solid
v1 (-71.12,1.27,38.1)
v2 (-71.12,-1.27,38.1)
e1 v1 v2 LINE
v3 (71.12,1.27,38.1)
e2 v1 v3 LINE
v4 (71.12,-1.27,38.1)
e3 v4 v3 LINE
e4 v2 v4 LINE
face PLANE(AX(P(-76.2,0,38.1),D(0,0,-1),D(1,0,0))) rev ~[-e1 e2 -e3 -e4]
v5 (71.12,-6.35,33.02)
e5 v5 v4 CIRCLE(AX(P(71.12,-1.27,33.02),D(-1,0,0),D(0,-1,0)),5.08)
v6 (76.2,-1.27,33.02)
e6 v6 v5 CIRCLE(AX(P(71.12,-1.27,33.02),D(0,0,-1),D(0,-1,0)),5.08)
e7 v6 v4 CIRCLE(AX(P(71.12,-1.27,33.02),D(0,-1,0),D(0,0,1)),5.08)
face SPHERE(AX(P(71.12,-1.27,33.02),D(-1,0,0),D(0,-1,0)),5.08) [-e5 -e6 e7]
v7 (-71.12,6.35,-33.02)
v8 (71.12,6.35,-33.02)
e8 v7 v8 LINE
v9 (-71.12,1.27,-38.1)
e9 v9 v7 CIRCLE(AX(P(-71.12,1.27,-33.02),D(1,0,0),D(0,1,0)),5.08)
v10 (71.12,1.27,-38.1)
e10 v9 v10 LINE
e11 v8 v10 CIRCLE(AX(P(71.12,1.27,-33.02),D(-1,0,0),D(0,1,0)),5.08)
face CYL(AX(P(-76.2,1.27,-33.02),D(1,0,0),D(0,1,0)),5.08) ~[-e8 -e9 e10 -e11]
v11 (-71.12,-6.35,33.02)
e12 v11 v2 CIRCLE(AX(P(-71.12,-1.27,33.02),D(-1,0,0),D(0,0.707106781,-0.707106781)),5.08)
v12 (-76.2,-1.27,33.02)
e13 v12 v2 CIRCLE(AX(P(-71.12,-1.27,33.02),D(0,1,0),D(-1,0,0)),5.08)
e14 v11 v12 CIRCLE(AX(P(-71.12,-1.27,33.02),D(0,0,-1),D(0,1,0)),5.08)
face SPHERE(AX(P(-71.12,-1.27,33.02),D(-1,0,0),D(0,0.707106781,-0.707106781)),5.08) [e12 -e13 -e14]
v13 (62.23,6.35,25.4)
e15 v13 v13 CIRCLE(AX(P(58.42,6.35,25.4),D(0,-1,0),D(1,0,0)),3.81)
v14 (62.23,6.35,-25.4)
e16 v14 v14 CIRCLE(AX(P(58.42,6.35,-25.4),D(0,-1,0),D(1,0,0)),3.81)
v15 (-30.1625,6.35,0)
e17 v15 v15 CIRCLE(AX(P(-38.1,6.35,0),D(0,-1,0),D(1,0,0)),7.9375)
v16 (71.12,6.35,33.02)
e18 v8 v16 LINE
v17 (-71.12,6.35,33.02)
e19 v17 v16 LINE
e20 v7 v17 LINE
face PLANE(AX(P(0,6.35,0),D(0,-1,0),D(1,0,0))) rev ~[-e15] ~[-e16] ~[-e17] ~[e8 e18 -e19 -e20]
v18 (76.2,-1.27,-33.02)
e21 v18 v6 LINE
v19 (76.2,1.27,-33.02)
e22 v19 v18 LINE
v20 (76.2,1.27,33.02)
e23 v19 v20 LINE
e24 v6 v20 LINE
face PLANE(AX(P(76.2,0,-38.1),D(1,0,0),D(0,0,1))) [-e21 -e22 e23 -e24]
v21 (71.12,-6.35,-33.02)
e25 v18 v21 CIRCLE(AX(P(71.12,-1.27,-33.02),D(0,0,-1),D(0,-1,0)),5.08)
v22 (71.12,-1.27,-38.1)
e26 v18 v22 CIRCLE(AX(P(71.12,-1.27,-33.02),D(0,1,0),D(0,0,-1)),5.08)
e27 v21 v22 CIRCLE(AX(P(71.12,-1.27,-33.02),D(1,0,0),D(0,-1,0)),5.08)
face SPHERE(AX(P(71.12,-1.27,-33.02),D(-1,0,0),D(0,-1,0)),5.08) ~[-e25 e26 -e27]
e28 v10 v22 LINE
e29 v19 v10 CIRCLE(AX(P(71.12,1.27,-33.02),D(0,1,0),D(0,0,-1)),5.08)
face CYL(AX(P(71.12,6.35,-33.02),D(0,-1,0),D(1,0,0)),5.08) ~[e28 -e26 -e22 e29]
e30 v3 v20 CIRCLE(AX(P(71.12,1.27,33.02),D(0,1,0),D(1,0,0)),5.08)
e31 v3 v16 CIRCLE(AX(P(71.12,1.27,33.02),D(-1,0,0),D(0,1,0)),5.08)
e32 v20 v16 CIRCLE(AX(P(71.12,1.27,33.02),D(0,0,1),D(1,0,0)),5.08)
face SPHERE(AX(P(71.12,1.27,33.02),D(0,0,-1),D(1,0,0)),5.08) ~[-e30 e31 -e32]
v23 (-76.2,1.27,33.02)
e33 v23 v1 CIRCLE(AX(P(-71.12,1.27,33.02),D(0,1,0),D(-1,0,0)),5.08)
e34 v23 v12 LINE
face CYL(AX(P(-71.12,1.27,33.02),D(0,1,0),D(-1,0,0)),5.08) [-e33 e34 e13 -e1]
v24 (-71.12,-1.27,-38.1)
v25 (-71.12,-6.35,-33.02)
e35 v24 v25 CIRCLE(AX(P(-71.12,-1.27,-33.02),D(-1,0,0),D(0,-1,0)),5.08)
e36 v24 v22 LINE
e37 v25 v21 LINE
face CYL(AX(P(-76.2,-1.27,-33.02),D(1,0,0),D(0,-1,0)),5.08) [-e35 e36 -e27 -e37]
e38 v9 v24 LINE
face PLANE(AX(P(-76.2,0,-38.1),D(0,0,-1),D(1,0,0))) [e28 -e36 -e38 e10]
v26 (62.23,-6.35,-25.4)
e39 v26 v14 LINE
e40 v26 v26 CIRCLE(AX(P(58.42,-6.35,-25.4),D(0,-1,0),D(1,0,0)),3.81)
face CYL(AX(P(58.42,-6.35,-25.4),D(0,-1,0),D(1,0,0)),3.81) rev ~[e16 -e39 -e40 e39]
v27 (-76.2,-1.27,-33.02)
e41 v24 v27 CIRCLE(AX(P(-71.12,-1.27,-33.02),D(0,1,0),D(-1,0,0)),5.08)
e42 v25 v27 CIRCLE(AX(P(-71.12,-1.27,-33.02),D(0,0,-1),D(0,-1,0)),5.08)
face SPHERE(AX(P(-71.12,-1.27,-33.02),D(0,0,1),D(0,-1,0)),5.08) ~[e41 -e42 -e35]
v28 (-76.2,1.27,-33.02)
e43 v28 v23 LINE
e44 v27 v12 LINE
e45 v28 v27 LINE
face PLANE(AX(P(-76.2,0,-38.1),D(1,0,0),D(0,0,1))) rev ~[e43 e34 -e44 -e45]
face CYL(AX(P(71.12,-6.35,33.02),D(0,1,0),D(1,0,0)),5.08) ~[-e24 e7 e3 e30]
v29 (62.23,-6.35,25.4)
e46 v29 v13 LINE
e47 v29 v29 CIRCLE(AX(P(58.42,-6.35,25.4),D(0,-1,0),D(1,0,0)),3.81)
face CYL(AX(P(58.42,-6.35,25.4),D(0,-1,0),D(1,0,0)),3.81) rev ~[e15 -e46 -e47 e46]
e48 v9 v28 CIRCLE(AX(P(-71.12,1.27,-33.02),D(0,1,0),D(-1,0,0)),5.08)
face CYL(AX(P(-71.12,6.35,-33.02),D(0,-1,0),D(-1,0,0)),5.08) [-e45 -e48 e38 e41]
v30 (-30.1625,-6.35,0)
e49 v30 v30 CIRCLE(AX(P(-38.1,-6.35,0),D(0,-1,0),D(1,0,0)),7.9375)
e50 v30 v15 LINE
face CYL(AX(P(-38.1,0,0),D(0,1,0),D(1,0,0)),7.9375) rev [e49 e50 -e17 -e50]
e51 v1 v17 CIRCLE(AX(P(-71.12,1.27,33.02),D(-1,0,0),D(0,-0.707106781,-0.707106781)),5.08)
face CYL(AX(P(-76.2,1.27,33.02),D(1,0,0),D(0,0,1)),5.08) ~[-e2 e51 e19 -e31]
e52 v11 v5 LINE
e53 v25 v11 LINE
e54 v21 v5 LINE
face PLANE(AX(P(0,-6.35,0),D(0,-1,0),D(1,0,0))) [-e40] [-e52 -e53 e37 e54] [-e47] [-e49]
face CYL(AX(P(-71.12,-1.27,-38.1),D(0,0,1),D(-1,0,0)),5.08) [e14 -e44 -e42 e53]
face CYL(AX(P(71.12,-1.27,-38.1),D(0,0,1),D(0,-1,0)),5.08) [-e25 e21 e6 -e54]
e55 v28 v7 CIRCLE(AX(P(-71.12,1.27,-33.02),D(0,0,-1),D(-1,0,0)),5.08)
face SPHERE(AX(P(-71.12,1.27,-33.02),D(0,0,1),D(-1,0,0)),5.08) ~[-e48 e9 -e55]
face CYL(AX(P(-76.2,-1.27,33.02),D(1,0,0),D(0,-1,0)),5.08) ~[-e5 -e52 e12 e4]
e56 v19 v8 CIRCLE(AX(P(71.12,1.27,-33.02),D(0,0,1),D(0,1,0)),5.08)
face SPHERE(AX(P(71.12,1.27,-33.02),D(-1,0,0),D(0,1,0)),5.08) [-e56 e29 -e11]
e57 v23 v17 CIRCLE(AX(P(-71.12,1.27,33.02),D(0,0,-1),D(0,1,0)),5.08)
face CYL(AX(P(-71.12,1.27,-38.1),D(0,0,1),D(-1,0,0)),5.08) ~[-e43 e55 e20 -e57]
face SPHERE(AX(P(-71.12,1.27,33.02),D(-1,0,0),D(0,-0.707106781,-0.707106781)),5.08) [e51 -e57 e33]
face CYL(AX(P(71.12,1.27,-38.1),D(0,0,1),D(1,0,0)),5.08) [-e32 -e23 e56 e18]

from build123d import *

# Parameters (mm, degrees)
F0_W         = 152.4
F0_H         = 76.2
F0_R         = 7.9375
F1_DEPTH     = 6.35
F2_R         = 5.08
F3_T1_DEPTH  = 2.54
F3_S5_W      = 5.08
F3_S5_H      = 5.08
F3_T6_DEPTH  = 5.08
F3_S11_W     = 5.08
F3_S11_H     = 5.08
F3_T12_DEPTH = 5.08
F4_R         = 3.81
F5_DEPTH     = 25.4


# Not quite as in the source:
# - a fillet or chamfer that OpenCascade refuses, or shapes differently, is made with other operations: its cross-section is extruded or revolved along the edge and cut away or added


with BuildPart() as f1:
    # F0 (on Front) → F1 (new body, symmetric)
    with BuildSketch(Plane.XZ):
        Rectangle(F0_W, F0_H)
        with Locations((-38.1, 0)):
            Circle(F0_R, mode=Mode.SUBTRACT)
    extrude(amount=F1_DEPTH, both=True)

    # F2
    f2_edges = [f1.edges().sort_by_distance(p)[0] for p in [
        (0, -6.35, 38.1),
        (-76.2, -6.35, 0),
        (0, -6.35, -38.1),
        (76.2, -6.35, 0),
        (-76.2, 6.35, 0),
        (-76.2, 0, -38.1),
        (0, 6.35, -38.1),
        (76.2, 6.35, 0),
        (76.2, 0, -38.1),
        (76.2, 0, 38.1),
        (0, 6.35, 38.1),
    ]]
    fillet(f2_edges, radius=F2_R)

    # F3: fillet of radius 5.08 on 1 edges, made by hand

    # F3_s2 → F3_t1 (cut)
    with BuildSketch(Plane.XZ.offset(-1.27)):
        with BuildLine():
            ThreePointArc((-76.2, 33.02), (-74.7121024484, 36.6121024484), (-71.12, 38.1))
            Line((-71.12, 38.1), (-76.2, 38.1))
            Line((-76.2, 38.1), (-76.2, 33.02))
        make_face()
    extrude(amount=F3_T1_DEPTH, mode=Mode.SUBTRACT)


with BuildPart() as f3_tool4:
    # F3_s5 → F3_t6 (new body)
    with BuildSketch(Plane.YZ.offset(-71.12)):
        with Locations((-3.81, 35.56)):
            Rectangle(F3_S5_W, F3_S5_H)
    extrude(amount=-F3_T6_DEPTH)

    # F3_s7 → F3_t8 (revolve, cut)
    with BuildSketch(Plane(origin=(-71.12, -1.27, 33.02), x_dir=(0, 0.7071067812, -0.7071067812), z_dir=(0, 0.7071067812, 0.7071067812))):
        with BuildLine():
            ThreePointArc((0, -5.08), (5.08, 0), (0, 5.08))
            Line((0, 5.08), (0, -5.08))
        make_face()
    revolve(axis=Axis((-71.12, -1.27, 33.02), (-1, 0, 0)), mode=Mode.SUBTRACT)


with BuildPart() as f1_1:
    add(f1.part)

    # F3_t3: cut F3_tool4
    add(f3_tool4.part, mode=Mode.SUBTRACT)


with BuildPart() as f3_tool10:
    # F3_s11 → F3_t12 (new body)
    with BuildSketch(Plane.YZ.offset(-71.12)):
        with Locations((3.81, 35.56)):
            Rectangle(F3_S11_W, F3_S11_H)
    extrude(amount=-F3_T12_DEPTH)

    # F3_s13 → F3_t14 (revolve, cut)
    with BuildSketch(Plane(origin=(-71.12, 1.27, 33.02), x_dir=(0, -0.7071067812, -0.7071067812), z_dir=(0, 0.7071067812, -0.7071067812))):
        with BuildLine():
            ThreePointArc((0, -5.08), (5.08, 0), (0, 5.08))
            Line((0, 5.08), (0, -5.08))
        make_face()
    revolve(axis=Axis((-71.12, 1.27, 33.02), (-1, 0, 0)), mode=Mode.SUBTRACT)


with BuildPart() as f1_2:
    add(f1_1.part)

    # F3_t9: cut F3_tool10
    add(f3_tool10.part, mode=Mode.SUBTRACT)

    # F4 (on face) → F5 (cut)
    with BuildSketch(Plane.XZ.offset(6.35)):
        with Locations((58.42, 25.4)):
            Circle(F4_R)
        with Locations((58.42, -25.4)):
            Circle(F4_R)
    extrude(amount=-F5_DEPTH, mode=Mode.SUBTRACT)


solid = f1_2.part
